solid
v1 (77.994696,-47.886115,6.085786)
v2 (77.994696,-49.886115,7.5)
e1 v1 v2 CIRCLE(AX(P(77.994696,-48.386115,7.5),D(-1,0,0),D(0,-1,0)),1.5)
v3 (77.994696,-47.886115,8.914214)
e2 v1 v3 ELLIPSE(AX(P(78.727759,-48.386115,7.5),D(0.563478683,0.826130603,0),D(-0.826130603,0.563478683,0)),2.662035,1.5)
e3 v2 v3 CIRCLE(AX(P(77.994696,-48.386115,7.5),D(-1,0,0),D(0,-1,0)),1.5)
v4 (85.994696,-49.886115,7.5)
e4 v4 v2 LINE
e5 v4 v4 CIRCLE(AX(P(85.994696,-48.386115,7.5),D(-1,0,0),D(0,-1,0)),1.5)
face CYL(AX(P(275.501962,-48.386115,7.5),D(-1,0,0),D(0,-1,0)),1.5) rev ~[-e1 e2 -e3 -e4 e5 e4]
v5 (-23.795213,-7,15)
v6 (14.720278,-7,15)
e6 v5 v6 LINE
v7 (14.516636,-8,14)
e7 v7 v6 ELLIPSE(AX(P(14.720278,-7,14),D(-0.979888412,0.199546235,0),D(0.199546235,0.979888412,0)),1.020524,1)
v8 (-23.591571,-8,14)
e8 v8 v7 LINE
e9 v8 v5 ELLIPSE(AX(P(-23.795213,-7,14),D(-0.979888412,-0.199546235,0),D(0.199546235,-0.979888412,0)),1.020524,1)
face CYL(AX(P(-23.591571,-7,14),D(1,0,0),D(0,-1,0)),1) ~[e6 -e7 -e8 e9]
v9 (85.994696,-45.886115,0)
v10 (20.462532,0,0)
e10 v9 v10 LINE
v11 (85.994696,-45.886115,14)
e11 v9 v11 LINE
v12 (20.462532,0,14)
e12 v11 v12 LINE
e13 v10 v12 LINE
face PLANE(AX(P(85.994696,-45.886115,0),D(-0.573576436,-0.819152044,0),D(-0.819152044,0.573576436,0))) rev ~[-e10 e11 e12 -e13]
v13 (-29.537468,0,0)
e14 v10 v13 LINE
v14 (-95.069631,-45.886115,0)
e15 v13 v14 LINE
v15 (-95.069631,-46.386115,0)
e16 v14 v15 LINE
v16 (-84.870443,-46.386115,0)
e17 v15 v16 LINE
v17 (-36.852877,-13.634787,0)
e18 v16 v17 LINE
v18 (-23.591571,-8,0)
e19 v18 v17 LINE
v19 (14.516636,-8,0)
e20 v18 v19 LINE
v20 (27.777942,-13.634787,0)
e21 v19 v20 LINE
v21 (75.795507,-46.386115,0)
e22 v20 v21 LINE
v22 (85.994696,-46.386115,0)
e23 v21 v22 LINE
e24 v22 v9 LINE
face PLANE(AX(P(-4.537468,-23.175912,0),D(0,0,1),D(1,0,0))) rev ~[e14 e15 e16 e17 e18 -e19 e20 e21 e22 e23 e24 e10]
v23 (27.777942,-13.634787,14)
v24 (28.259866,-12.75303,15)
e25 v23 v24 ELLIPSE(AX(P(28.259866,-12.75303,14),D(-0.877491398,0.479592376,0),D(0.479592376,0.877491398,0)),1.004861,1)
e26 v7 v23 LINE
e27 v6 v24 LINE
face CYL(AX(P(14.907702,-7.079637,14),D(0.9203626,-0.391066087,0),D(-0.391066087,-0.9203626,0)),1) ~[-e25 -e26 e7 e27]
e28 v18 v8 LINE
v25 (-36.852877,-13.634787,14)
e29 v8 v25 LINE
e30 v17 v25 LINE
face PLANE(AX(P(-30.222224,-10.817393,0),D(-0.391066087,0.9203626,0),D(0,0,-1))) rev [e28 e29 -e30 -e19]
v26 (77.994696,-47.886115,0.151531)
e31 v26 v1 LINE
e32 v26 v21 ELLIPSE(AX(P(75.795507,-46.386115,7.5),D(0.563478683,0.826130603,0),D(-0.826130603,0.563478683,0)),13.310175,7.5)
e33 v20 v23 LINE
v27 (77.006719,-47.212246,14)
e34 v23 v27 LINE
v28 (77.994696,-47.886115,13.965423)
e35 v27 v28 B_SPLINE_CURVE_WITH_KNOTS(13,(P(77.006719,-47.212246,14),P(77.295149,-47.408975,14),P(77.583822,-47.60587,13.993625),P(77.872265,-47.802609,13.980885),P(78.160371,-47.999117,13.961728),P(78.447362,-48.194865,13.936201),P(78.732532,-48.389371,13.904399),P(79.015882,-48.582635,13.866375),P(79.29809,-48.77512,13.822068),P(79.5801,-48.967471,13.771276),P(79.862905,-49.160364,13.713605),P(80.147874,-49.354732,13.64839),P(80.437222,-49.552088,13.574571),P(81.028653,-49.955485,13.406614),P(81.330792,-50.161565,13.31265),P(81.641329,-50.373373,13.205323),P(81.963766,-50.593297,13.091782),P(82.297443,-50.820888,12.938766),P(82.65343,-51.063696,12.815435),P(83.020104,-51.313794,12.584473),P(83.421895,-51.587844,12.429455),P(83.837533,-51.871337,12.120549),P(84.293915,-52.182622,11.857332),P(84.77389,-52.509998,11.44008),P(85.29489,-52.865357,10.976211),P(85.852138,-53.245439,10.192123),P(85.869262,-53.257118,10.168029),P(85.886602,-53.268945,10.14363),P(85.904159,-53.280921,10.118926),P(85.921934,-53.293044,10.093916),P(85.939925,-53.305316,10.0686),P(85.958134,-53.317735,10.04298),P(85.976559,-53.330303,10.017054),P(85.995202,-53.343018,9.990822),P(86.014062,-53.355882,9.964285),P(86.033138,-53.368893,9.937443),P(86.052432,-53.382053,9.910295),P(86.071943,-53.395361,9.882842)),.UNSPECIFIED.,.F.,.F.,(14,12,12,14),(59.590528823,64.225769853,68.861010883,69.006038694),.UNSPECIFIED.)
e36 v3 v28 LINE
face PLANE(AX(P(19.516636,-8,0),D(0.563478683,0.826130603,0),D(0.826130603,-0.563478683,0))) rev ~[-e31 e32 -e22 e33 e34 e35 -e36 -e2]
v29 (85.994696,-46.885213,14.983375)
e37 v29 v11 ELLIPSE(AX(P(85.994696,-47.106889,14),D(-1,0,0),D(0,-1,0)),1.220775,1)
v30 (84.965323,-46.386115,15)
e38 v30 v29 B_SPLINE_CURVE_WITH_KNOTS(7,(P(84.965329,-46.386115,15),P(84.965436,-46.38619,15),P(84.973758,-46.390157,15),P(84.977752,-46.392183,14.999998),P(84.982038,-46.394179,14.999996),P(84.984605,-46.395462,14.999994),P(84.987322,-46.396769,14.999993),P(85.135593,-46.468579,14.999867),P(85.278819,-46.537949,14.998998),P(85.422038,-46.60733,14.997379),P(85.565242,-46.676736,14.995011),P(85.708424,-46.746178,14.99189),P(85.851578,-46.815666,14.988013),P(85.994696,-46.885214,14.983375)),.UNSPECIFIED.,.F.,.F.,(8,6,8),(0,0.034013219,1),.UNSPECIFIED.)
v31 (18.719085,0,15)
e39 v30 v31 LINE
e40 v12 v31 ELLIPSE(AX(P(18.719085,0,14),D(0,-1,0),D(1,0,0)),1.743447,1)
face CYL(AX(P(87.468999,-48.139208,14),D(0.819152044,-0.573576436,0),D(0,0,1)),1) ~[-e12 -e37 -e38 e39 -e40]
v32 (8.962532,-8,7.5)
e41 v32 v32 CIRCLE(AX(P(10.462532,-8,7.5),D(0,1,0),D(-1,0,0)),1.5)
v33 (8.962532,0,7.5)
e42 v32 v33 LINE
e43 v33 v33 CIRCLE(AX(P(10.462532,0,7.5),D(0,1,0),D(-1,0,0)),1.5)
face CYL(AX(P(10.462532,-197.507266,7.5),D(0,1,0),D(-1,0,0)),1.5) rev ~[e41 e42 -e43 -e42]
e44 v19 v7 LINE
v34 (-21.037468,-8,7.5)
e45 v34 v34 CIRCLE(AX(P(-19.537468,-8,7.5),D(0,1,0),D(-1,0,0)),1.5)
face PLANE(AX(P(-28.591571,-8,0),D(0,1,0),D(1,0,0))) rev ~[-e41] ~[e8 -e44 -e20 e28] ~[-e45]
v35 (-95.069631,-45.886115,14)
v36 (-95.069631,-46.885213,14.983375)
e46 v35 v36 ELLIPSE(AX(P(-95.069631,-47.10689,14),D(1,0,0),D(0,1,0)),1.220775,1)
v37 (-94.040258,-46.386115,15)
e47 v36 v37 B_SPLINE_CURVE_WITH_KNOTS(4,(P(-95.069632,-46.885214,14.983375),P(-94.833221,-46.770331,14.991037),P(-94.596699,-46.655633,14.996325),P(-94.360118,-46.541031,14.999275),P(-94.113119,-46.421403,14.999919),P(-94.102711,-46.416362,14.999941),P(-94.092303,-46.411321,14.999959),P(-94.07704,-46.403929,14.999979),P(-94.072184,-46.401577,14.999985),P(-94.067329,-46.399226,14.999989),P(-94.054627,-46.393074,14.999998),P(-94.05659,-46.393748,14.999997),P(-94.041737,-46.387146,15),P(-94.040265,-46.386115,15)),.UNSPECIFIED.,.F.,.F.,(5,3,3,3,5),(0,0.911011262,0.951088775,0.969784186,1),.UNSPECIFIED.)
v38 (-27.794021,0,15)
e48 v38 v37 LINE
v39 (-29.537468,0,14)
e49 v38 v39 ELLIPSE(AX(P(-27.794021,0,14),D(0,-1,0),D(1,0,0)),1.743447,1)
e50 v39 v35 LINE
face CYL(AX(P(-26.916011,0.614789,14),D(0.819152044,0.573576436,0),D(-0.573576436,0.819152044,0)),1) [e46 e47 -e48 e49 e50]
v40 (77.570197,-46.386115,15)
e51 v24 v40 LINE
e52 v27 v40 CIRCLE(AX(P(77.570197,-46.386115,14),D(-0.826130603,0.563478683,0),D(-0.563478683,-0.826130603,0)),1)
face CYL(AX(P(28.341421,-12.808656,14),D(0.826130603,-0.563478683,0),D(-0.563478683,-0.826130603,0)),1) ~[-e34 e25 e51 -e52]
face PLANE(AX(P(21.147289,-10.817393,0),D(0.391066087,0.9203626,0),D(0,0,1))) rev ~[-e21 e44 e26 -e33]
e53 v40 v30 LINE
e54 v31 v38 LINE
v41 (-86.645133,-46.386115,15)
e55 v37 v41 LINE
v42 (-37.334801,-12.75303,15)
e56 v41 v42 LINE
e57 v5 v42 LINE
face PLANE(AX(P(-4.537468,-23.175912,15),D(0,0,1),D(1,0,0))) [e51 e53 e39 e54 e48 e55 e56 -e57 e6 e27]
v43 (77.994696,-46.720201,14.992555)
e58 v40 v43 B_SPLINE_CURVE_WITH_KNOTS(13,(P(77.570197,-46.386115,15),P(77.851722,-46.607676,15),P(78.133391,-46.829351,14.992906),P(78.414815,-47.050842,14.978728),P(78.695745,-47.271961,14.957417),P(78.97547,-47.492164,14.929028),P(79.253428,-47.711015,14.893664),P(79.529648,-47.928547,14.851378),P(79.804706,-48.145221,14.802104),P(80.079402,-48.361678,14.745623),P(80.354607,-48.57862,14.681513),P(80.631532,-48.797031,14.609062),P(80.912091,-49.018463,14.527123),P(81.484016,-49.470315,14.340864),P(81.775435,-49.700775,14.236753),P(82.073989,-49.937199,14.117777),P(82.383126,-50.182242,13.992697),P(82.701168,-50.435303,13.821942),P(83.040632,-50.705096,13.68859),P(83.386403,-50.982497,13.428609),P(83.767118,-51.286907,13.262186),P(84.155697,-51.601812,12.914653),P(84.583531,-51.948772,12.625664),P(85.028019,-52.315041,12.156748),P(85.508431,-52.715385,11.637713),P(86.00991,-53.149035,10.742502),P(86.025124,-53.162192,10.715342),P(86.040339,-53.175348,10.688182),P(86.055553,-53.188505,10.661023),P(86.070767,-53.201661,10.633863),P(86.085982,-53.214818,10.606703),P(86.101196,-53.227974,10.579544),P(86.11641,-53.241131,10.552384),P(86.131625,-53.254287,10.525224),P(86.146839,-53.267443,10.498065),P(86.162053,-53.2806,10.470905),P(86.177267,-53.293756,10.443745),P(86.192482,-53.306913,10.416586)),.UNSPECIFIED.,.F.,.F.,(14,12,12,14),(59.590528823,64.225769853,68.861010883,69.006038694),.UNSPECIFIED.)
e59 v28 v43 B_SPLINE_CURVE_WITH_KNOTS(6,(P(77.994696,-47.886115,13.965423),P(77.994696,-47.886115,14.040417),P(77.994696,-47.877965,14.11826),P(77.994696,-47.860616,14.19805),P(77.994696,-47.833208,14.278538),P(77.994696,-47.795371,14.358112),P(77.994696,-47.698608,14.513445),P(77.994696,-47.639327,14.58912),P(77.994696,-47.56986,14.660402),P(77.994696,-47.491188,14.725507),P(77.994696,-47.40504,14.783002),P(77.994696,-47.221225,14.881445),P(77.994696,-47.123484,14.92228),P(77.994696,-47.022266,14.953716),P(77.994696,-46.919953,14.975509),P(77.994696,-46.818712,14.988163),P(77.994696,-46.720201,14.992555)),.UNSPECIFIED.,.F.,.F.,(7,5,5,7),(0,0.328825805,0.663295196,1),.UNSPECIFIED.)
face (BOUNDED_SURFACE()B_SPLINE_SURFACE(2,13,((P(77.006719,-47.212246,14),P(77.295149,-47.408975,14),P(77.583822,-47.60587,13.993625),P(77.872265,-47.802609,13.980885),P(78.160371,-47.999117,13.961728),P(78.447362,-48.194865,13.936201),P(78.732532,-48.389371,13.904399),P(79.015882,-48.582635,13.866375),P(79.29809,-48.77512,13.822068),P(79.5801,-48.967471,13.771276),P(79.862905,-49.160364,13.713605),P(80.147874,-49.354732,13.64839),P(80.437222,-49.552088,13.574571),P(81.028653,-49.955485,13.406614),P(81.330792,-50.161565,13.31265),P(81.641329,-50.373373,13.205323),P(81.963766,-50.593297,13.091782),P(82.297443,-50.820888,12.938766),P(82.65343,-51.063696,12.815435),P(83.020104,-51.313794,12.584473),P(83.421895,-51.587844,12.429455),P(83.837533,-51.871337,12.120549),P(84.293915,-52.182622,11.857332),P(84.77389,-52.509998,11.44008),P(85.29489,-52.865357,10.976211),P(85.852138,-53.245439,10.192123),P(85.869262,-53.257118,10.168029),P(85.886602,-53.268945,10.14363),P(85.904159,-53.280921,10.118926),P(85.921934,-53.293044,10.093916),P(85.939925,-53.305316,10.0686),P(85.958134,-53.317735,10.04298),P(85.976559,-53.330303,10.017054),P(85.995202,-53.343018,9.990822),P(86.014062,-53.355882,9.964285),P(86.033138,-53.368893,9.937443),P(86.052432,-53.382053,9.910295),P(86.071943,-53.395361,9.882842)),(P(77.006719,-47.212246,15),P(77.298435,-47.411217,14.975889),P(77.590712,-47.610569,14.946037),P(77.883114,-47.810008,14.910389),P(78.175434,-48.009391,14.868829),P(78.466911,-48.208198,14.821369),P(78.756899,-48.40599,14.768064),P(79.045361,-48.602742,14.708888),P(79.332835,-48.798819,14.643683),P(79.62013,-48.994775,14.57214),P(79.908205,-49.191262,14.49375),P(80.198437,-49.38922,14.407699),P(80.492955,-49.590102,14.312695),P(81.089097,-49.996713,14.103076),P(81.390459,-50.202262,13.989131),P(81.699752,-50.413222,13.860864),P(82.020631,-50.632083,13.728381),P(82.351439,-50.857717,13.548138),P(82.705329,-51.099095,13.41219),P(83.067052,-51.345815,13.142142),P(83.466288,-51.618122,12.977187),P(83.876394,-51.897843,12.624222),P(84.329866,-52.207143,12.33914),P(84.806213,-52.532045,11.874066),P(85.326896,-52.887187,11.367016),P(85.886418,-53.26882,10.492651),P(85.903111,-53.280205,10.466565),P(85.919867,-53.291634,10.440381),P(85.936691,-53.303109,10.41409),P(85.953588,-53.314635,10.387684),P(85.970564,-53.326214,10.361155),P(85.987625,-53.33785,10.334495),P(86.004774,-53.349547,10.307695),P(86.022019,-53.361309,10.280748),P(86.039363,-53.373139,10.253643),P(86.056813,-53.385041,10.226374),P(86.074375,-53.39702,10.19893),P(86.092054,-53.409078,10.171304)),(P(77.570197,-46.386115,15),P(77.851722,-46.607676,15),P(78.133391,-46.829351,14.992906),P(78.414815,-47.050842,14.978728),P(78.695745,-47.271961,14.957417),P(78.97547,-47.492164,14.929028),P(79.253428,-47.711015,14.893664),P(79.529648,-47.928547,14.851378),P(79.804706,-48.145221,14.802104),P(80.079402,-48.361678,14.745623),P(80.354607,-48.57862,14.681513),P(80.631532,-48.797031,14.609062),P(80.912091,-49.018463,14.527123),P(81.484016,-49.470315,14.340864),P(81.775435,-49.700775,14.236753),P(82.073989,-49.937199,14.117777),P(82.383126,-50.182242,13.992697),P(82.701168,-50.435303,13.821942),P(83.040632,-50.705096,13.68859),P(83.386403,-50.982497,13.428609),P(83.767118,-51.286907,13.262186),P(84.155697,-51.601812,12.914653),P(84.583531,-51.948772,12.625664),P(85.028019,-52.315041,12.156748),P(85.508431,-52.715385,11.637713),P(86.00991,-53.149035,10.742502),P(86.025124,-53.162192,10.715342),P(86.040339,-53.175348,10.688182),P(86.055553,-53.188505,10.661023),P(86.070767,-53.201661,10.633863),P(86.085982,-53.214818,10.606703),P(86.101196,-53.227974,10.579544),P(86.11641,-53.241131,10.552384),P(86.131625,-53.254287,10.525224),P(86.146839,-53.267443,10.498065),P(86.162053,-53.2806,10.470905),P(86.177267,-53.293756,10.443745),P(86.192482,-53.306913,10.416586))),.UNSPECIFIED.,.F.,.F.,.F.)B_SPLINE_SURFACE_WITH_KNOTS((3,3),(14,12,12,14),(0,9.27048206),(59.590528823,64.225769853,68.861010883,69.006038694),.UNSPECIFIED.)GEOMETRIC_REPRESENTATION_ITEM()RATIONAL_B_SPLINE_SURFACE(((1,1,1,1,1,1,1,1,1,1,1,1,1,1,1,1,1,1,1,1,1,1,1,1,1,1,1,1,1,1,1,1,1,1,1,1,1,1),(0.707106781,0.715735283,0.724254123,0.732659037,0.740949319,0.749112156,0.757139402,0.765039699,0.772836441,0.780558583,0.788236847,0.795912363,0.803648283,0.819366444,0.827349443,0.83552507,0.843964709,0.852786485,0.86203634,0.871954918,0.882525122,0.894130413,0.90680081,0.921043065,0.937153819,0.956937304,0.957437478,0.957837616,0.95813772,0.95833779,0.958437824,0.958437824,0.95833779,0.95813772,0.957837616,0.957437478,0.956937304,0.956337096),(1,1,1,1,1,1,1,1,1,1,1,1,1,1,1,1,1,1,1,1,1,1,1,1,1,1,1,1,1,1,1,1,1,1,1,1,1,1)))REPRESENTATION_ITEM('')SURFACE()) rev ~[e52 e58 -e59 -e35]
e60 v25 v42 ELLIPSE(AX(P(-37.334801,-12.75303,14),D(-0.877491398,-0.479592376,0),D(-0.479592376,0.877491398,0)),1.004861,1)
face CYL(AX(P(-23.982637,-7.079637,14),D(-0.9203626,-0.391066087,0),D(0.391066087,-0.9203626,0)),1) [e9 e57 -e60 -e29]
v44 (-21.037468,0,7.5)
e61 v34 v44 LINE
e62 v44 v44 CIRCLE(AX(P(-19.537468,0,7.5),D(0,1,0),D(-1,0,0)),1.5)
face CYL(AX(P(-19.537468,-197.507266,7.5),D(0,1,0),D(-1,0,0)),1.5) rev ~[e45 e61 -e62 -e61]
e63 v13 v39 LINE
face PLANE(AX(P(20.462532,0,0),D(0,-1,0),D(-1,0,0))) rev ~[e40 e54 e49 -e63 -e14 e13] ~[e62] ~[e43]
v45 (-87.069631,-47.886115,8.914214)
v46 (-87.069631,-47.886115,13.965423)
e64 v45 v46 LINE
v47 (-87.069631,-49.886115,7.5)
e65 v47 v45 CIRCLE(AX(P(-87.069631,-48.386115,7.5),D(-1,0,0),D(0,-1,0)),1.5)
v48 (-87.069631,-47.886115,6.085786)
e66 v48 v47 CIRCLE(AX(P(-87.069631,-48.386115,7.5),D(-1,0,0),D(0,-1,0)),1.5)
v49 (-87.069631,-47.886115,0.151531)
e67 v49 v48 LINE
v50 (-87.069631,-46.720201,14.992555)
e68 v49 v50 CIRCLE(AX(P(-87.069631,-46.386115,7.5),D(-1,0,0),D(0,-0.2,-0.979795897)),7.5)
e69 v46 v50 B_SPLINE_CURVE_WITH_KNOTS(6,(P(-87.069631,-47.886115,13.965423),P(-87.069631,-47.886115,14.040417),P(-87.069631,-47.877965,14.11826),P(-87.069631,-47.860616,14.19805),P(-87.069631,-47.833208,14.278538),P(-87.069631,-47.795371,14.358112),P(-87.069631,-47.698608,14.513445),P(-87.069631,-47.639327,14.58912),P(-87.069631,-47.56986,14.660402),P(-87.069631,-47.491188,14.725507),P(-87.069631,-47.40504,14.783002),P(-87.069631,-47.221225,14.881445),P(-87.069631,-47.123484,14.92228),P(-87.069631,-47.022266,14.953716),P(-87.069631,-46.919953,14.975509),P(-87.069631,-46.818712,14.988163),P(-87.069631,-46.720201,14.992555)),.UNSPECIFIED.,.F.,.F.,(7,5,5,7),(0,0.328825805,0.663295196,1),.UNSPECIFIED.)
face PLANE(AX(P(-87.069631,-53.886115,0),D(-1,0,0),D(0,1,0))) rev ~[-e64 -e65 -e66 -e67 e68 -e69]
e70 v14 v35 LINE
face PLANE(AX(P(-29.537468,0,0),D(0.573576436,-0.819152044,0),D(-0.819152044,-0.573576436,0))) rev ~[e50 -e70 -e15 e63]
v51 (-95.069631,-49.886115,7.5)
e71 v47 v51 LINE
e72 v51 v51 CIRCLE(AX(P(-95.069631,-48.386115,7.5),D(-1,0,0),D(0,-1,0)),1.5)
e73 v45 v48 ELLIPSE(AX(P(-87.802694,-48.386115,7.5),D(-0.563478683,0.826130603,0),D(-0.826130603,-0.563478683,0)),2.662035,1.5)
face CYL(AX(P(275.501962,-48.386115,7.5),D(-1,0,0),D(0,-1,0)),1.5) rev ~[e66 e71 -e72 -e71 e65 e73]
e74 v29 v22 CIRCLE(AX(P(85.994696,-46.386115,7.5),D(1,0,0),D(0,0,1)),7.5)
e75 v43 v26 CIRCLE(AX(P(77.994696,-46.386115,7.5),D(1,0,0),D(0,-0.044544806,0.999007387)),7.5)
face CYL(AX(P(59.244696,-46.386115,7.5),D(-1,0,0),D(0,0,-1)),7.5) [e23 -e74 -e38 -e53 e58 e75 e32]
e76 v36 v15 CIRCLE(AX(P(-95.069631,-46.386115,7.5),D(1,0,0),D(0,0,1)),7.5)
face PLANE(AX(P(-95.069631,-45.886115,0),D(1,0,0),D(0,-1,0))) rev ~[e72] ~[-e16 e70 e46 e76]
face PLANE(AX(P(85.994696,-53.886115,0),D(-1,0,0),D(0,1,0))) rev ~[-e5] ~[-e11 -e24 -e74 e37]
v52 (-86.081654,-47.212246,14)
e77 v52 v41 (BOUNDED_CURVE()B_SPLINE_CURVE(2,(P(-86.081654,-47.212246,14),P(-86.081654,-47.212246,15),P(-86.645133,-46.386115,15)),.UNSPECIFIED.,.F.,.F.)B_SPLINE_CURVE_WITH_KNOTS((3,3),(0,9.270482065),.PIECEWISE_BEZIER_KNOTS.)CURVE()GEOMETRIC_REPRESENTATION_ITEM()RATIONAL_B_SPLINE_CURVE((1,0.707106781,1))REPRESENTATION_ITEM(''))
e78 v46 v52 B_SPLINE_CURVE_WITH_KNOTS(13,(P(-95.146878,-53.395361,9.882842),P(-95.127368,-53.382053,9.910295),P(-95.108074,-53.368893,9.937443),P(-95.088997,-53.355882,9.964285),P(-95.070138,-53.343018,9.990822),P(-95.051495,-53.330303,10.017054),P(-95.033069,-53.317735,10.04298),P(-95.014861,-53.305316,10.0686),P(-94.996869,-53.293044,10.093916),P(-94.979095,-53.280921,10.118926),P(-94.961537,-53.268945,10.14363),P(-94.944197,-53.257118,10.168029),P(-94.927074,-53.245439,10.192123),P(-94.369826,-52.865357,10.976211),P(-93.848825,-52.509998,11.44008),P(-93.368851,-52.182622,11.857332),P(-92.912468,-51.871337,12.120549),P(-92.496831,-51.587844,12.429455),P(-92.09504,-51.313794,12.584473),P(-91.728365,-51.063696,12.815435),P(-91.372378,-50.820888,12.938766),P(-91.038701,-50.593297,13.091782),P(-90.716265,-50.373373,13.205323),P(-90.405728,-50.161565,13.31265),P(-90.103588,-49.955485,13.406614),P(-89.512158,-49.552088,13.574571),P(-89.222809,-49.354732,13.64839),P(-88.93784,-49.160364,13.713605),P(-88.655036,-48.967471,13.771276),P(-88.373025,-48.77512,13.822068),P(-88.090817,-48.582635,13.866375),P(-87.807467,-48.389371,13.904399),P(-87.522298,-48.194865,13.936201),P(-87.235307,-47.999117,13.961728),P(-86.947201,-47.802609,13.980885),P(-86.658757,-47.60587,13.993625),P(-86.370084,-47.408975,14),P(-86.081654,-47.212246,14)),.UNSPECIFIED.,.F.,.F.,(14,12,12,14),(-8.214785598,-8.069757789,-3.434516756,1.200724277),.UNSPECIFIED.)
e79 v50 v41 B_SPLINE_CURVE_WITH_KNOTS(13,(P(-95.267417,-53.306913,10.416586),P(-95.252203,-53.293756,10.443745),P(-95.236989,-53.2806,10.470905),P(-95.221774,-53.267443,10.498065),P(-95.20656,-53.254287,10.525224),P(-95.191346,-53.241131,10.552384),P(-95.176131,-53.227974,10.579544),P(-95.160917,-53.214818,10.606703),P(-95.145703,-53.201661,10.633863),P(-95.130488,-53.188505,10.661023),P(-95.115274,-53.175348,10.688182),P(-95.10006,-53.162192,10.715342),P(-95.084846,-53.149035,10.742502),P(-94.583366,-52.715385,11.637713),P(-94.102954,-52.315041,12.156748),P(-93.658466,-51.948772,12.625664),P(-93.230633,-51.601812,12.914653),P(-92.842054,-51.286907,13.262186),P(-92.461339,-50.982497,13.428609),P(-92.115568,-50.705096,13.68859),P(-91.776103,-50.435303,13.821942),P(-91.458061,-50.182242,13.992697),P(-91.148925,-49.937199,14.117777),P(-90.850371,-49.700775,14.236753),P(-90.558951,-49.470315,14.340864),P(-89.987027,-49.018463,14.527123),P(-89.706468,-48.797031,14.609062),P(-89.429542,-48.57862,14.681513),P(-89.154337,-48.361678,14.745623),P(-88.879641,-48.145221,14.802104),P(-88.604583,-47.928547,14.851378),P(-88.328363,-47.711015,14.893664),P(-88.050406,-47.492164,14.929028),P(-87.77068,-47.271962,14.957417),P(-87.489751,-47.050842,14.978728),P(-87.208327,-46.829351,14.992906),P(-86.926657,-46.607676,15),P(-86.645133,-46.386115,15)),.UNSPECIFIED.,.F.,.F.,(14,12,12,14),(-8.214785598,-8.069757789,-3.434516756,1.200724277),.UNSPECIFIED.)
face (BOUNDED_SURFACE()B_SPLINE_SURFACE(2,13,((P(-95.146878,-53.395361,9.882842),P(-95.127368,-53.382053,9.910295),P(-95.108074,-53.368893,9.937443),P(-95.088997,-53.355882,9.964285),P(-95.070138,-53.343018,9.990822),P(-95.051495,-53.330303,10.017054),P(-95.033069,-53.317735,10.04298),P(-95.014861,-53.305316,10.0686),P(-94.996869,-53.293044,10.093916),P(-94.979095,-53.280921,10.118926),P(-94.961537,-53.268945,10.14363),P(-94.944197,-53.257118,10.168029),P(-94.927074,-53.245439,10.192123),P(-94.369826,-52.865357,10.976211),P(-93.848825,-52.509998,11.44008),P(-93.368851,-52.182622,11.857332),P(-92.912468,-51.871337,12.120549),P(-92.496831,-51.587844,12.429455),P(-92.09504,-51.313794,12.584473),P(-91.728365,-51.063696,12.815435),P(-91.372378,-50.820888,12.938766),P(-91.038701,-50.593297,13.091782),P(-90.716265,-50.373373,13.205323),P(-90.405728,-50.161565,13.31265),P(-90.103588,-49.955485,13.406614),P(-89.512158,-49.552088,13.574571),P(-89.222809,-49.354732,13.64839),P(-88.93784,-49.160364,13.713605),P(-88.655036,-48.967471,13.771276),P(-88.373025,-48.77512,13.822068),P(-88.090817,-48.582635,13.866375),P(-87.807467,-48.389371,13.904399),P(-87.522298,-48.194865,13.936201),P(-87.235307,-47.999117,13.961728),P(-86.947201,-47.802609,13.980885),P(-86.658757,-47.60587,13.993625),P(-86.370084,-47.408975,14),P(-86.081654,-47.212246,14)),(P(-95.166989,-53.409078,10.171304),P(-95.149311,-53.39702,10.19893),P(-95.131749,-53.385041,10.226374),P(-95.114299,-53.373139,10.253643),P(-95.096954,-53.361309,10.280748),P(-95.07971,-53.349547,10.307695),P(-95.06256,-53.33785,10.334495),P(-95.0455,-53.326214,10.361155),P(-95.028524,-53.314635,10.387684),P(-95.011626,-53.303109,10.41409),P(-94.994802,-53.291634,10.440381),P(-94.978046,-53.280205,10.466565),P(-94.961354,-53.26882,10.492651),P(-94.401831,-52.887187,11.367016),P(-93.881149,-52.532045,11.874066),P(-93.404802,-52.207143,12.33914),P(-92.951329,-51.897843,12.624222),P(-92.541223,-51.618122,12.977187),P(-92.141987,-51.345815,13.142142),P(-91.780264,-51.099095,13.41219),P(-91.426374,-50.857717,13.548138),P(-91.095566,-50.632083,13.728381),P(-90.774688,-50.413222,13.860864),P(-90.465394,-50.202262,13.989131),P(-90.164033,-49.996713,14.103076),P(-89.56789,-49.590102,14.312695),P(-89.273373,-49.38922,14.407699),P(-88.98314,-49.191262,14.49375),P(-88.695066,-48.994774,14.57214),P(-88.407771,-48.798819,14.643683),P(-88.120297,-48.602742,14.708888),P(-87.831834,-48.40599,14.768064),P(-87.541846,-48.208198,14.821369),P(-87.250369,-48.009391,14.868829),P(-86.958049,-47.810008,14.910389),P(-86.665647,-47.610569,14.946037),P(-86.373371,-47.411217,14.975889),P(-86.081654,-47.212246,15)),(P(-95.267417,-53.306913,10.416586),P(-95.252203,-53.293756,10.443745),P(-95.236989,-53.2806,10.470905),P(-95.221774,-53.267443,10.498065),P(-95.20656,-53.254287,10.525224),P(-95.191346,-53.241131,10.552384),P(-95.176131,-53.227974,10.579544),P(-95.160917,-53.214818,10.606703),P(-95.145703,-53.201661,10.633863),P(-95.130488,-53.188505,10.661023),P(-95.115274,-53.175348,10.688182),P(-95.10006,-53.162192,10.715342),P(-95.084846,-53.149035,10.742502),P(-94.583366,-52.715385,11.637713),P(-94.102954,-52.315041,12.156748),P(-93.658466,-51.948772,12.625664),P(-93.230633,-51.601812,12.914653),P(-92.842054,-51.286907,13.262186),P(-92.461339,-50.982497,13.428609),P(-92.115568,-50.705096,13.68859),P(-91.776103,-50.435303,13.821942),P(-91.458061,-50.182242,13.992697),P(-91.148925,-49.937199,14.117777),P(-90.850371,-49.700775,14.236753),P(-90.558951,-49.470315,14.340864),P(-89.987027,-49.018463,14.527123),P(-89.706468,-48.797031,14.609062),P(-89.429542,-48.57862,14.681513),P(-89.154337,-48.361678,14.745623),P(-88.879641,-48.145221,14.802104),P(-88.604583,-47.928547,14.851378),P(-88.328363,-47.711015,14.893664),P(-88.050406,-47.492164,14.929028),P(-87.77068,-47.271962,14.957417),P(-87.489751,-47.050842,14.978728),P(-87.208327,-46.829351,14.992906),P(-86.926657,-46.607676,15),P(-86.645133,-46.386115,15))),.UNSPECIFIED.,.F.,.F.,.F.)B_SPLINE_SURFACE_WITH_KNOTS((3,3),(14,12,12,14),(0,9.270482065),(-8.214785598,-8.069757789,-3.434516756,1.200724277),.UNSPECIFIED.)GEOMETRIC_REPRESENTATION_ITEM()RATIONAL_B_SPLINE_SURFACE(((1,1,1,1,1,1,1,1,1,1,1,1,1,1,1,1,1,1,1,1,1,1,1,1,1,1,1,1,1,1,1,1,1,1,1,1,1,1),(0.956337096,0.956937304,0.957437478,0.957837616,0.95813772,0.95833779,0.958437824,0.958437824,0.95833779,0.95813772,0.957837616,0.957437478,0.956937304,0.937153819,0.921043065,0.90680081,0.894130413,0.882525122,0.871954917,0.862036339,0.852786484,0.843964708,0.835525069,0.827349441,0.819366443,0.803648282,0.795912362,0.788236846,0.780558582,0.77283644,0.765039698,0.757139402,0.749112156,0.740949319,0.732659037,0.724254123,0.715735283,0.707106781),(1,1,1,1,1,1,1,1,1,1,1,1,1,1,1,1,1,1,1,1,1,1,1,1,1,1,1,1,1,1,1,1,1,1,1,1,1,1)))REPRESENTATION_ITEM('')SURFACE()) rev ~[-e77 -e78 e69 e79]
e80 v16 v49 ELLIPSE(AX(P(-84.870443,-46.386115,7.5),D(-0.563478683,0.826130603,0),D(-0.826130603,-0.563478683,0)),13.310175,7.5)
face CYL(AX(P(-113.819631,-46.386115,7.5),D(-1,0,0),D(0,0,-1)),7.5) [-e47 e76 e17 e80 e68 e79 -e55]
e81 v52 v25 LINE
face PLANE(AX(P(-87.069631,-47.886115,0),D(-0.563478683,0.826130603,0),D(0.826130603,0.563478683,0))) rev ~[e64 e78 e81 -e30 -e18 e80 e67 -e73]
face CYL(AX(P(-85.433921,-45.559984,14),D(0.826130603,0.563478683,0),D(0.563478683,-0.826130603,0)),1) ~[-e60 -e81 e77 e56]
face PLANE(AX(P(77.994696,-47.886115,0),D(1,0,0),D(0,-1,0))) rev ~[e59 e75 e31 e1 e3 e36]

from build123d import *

# Parameters (mm, degrees)
F1_DEPTH    = 15
F3_D        = 3
F5_D        = 3
F6_T1_DEPTH = 45.5
F6_T3_DEPTH = 45.5
F7_T1_DEPTH = 85
F7_T3_DEPTH = 85
F8_SIZE2    = 10
F8_SIZE     = 5
F9_R        = 1


# Not quite as in the source:
# - a fillet or chamfer that OpenCascade refuses, or shapes differently, is made with other operations: its cross-section is extruded or revolved along the edge and cut away or added
# - a feature names something its author has since deleted; it is built from what else it names


with BuildPart() as f1:
    # F0 (on Top) → F1 (new body)
    with BuildSketch(Plane.XY):
        Polygon((20.4625322646, 0), (-29.5374677354, 0), (-95.0696312785, -45.8861149081), (-95.0696312785, -53.8861149081), (-87.0696312785, -53.8861149081), (-87.0696312785, -47.8861149081), (-28.5915713688, -8), (19.516635898, -8), (77.9946958077, -47.8861149081), (77.9946958077, -53.8861149081), (85.9946958077, -53.8861149081), (85.9946958077, -45.8861149081), align=None)
    extrude(amount=F1_DEPTH)

    # F3 (through all)
    with Locations(Plane.XZ.offset(8)):
        with Locations((10.4625322646, 7.5), (-19.5374677354, 7.5)):
            Hole(F3_D / 2)

    # F5 (through all)
    with Locations(Plane.YZ.offset(85.9946958077)):
        with Locations((-48.3861149081, 7.5)):
            Hole(F5_D / 2)

    # F6: fillet of radius 7.5 on 4 edges, made by hand

    # F6_s2 → F6_t1 (cut)
    with BuildSketch(Plane.YZ.offset(59.2446958077)):
        with BuildLine():
            ThreePointArc((-46.3861149081, 0), (-51.689415767, 2.1966991411), (-53.8861149081, 7.5))
            Line((-53.8861149081, 7.5), (-53.8861149081, 0))
            Line((-53.8861149081, 0), (-46.3861149081, 0))
        make_face()
        with BuildLine():
            ThreePointArc((-46.3861149081, 15), (-51.689415767, 12.8033008589), (-53.8861149081, 7.5))
            Line((-53.8861149081, 7.5), (-53.8861149081, 15))
            Line((-53.8861149081, 15), (-46.3861149081, 15))
        make_face()
    extrude(amount=F6_T1_DEPTH, mode=Mode.SUBTRACT)

    # F6_s4 → F6_t3 (cut)
    with BuildSketch(Plane.YZ.offset(-113.8196312785)):
        with BuildLine():
            ThreePointArc((-46.3861149081, 0), (-51.689415767, 2.1966991411), (-53.8861149081, 7.5))
            Line((-53.8861149081, 7.5), (-53.8861149081, 0))
            Line((-53.8861149081, 0), (-46.3861149081, 0))
        make_face()
        with BuildLine():
            ThreePointArc((-46.3861149081, 15), (-51.689415767, 12.8033008589), (-53.8861149081, 7.5))
            Line((-53.8861149081, 7.5), (-53.8861149081, 15))
            Line((-53.8861149081, 15), (-46.3861149081, 15))
        make_face()
    extrude(amount=F6_T3_DEPTH, mode=Mode.SUBTRACT)

    # F7: fillet of radius 1 on 2 edges, made by hand

    # F7_s2 → F7_t1 (cut)
    with BuildSketch(Plane(origin=(-17.7720582311, -12.4441291429, 0), x_dir=(0, 0, 1), z_dir=(-0.8191520443, -0.5735764364, 0))):
        with BuildLine():
            ThreePointArc((14, 16.9419954825), (14.7071067812, 16.6491022637), (15, 15.9419954825))
            Line((15, 15.9419954825), (15, 16.9419954825))
            Line((15, 16.9419954825), (14, 16.9419954825))
        make_face()
    extrude(amount=F7_T1_DEPTH, mode=Mode.SUBTRACT)

    # F7_s4 → F7_t3 (cut)
    with BuildSketch(Plane(origin=(81.3106088951, -56.9343012848, 0), x_dir=(0, 0, 1), z_dir=(-0.8191520443, 0.5735764364, 0))):
        with BuildLine():
            ThreePointArc((15, 10.7368263351), (14.7071067812, 11.4439331162), (14, 11.7368263351))
            Line((14, 11.7368263351), (15, 11.7368263351))
            Line((15, 11.7368263351), (15, 10.7368263351))
        make_face()
    extrude(amount=F7_T3_DEPTH, mode=Mode.SUBTRACT)

    # F8
    f8_edges = [f1.edges().sort_by_distance(p)[0] for p in [
        (-28.591571, -8, 7.5),
        (19.516636, -8, 7.5),
    ]]
    f8_side = f1.faces().sort_by_distance((-4.537468, -8, 7.5))[0]
    chamfer(f8_edges, length=F8_SIZE, length2=F8_SIZE2, reference=f8_side)

    # F9
    f9_edges = [f1.edges().sort_by_distance(p)[0] for p in [
        (-60.86166, -30.010451, 15),
        (-30.222224, -10.817393, 15),
        (-4.537468, -8, 15),
        (21.147289, -10.817393, 15),
        (51.786725, -30.010451, 15),
    ]]
    fillet(f9_edges, radius=F9_R)


solid = f1.part
